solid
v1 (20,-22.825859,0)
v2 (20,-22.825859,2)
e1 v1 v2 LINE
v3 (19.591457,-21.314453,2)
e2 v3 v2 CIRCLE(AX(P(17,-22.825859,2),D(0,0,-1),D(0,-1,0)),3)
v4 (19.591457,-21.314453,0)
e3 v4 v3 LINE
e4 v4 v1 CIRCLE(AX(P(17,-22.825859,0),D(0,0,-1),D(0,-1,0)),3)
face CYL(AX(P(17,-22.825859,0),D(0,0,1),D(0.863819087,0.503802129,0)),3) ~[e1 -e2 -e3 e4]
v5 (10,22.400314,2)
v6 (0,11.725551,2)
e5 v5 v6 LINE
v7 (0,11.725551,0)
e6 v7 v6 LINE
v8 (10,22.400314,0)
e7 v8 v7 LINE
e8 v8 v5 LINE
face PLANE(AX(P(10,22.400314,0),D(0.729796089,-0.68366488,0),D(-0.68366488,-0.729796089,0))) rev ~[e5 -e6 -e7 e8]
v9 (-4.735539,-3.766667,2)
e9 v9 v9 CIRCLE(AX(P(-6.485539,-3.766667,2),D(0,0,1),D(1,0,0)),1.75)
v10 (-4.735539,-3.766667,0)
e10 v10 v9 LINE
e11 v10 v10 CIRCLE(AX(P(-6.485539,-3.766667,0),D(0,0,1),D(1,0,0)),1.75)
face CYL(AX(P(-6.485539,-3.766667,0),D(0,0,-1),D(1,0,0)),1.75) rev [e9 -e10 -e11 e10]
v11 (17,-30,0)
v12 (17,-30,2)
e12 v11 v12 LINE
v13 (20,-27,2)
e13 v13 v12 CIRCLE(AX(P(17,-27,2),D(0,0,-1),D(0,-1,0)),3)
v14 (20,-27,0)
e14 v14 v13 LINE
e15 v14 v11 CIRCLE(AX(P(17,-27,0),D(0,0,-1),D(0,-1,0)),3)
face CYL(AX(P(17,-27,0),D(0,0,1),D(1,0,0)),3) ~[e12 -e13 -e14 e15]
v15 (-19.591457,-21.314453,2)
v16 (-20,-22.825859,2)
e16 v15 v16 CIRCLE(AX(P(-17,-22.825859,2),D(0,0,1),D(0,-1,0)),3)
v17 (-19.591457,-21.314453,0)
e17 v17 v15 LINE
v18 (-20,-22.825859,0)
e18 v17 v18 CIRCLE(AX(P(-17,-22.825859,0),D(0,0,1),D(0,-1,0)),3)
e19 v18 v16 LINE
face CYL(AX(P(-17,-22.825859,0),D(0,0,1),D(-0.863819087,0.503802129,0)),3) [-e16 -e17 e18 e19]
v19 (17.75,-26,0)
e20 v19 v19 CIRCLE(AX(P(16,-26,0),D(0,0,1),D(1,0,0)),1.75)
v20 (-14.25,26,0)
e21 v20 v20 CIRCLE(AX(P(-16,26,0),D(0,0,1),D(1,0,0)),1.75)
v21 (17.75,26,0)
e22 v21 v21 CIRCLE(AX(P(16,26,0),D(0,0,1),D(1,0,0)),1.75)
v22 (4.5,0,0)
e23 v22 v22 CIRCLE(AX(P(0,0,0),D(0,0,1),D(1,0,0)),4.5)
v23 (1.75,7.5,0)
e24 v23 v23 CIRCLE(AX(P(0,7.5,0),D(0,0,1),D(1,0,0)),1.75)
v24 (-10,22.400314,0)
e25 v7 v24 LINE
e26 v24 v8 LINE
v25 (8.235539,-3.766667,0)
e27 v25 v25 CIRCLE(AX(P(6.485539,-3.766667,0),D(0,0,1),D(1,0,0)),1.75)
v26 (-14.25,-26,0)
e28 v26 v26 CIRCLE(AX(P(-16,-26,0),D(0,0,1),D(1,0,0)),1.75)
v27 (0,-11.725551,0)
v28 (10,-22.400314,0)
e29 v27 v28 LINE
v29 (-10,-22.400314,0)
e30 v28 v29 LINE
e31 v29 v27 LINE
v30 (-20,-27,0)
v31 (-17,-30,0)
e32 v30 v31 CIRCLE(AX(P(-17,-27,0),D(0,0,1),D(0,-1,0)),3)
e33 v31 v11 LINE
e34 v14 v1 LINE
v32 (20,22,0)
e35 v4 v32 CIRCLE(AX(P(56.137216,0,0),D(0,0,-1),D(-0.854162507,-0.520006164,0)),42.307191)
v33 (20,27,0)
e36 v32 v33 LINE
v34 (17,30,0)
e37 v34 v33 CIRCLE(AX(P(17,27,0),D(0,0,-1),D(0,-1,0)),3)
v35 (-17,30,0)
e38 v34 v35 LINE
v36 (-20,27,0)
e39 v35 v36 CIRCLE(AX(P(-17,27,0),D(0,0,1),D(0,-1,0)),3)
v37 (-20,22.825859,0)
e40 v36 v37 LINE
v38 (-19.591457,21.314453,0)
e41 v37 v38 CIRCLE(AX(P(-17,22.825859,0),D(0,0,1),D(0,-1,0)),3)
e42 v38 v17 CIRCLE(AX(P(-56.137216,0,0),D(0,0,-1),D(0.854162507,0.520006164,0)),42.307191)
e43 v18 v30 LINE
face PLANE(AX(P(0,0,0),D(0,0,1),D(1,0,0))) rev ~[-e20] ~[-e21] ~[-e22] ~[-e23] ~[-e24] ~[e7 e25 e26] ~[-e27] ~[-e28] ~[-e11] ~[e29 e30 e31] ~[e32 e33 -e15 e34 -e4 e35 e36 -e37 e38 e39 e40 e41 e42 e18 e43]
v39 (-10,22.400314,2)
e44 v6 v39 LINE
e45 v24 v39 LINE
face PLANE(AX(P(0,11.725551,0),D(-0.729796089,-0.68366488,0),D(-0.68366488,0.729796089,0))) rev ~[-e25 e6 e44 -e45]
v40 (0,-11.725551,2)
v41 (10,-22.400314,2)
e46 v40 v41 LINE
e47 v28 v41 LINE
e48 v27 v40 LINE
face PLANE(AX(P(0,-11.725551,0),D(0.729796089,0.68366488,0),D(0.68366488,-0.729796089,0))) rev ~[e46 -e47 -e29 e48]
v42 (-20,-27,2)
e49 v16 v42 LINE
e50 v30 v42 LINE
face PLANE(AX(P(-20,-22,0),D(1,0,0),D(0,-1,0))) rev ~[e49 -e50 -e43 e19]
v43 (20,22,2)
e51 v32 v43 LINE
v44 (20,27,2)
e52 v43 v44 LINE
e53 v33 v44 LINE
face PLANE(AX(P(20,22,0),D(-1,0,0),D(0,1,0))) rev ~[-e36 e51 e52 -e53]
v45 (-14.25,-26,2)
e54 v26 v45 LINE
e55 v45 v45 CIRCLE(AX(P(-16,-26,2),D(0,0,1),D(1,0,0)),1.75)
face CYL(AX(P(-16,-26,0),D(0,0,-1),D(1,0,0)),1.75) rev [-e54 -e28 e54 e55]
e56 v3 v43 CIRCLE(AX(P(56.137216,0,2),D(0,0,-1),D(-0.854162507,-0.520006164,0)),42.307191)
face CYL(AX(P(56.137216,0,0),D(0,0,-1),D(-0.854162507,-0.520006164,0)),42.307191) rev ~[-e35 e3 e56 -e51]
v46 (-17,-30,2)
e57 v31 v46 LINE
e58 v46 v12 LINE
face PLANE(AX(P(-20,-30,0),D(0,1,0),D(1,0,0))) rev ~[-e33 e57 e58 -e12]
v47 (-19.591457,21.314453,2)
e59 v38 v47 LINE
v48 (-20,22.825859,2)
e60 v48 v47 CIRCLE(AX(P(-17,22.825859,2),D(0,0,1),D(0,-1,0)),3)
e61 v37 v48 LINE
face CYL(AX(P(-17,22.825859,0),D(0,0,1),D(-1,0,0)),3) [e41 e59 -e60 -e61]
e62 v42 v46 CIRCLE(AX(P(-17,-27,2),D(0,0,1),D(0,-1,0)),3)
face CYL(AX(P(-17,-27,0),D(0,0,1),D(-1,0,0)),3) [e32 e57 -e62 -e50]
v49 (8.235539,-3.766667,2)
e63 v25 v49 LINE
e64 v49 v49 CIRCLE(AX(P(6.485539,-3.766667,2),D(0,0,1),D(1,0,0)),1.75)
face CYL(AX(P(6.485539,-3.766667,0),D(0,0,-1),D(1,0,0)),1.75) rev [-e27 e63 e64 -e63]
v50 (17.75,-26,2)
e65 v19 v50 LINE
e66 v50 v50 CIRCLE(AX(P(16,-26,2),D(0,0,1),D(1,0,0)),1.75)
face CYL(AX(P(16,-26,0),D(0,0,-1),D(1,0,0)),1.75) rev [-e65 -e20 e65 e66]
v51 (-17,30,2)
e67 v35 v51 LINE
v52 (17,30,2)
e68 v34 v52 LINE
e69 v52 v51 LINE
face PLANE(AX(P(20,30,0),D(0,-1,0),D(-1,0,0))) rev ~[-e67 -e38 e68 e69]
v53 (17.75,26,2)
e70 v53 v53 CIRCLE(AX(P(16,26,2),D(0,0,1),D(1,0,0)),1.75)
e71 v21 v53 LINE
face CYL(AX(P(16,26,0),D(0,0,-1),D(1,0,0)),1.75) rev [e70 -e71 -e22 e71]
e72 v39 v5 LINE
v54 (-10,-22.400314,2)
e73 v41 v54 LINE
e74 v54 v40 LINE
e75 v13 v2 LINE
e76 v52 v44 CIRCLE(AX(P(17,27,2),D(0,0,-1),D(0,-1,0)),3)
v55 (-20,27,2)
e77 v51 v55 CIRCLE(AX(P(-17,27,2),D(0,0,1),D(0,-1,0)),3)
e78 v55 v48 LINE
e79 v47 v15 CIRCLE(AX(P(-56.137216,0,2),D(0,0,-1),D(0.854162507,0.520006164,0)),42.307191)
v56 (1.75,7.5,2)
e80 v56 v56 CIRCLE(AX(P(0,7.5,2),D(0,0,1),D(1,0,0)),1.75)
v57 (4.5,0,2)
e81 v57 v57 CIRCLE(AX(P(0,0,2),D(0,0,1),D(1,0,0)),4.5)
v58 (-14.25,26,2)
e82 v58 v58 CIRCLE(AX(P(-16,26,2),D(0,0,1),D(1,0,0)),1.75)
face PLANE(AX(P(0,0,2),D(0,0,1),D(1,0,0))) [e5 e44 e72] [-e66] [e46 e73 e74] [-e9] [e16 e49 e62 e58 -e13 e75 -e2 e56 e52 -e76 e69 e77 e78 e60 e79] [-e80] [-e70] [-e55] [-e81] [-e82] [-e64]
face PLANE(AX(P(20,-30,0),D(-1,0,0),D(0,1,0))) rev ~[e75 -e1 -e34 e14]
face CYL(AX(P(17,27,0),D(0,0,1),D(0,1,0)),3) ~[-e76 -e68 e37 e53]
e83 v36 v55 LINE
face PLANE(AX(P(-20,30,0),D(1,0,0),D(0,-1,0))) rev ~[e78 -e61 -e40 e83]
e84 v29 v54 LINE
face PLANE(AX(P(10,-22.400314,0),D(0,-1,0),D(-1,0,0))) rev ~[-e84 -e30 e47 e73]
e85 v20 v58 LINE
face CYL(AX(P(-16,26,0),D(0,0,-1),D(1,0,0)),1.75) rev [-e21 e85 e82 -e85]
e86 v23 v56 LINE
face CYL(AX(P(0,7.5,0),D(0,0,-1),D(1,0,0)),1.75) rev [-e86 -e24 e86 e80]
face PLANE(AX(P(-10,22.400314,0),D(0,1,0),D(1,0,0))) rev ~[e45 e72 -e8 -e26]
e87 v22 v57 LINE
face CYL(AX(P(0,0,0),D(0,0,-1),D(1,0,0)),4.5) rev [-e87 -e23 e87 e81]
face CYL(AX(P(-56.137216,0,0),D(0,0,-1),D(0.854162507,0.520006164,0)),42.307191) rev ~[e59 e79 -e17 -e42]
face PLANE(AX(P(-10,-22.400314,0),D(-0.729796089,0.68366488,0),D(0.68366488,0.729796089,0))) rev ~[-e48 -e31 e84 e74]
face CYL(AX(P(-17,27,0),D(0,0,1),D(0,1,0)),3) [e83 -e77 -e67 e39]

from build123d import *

# Parameters (mm, degrees)
F0_R     = 1.75
F0_R_2   = 4.5
F1_DEPTH = 2
F2_R     = 3


with BuildPart() as f1:
    # F0 (on Top) → F1 (new body)
    with BuildSketch(Plane.XY):
        with BuildLine():
            Line((20, 30), (-20, 30))
            Line((-20, 30), (-20, 22))
            ThreePointArc((-20, 22), (-13.8300253787, 0), (-20, -22))
            Line((-20, -22), (-20, -30))
            Line((-20, -30), (20, -30))
            Line((20, -30), (20, -22))
            ThreePointArc((20, -22), (13.8300253787, 0), (20, 22))
            Line((20, 22), (20, 30))
        make_face()
        with Locations((-16, -26)):
            Circle(F0_R, mode=Mode.SUBTRACT)
        with Locations((-6.4855394704, -3.7666666667)):
            Circle(F0_R, mode=Mode.SUBTRACT)
        Polygon((10, -22.4003139883), (0, -22.4003139883), (-10, -22.4003139883), (0, -11.7255505174), align=None, mode=Mode.SUBTRACT)
        with Locations((16, -26)):
            Circle(F0_R, mode=Mode.SUBTRACT)
        with Locations((6.4855394704, -3.7666666667)):
            Circle(F0_R, mode=Mode.SUBTRACT)
        with Locations((-16, 26)):
            Circle(F0_R, mode=Mode.SUBTRACT)
        Circle(F0_R_2, mode=Mode.SUBTRACT)
        with Locations((0, 7.5)):
            Circle(F0_R, mode=Mode.SUBTRACT)
        Polygon((0, 22.4003139883), (10, 22.4003139883), (0, 11.7255505174), (-10, 22.4003139883), align=None, mode=Mode.SUBTRACT)
        with Locations((16, 26)):
            Circle(F0_R, mode=Mode.SUBTRACT)
    extrude(amount=F1_DEPTH)

    # F2
    f2_edges = [f1.edges().sort_by_distance(p)[0] for p in [
        (-20, 30, 1),
        (-20, -30, 1),
        (20, -30, 1),
        (20, 30, 1),
        (20, -22, 1),
        (-20, -22, 1),
        (-20, 22, 1),
    ]]
    fillet(f2_edges, radius=F2_R)


solid = f1.part
